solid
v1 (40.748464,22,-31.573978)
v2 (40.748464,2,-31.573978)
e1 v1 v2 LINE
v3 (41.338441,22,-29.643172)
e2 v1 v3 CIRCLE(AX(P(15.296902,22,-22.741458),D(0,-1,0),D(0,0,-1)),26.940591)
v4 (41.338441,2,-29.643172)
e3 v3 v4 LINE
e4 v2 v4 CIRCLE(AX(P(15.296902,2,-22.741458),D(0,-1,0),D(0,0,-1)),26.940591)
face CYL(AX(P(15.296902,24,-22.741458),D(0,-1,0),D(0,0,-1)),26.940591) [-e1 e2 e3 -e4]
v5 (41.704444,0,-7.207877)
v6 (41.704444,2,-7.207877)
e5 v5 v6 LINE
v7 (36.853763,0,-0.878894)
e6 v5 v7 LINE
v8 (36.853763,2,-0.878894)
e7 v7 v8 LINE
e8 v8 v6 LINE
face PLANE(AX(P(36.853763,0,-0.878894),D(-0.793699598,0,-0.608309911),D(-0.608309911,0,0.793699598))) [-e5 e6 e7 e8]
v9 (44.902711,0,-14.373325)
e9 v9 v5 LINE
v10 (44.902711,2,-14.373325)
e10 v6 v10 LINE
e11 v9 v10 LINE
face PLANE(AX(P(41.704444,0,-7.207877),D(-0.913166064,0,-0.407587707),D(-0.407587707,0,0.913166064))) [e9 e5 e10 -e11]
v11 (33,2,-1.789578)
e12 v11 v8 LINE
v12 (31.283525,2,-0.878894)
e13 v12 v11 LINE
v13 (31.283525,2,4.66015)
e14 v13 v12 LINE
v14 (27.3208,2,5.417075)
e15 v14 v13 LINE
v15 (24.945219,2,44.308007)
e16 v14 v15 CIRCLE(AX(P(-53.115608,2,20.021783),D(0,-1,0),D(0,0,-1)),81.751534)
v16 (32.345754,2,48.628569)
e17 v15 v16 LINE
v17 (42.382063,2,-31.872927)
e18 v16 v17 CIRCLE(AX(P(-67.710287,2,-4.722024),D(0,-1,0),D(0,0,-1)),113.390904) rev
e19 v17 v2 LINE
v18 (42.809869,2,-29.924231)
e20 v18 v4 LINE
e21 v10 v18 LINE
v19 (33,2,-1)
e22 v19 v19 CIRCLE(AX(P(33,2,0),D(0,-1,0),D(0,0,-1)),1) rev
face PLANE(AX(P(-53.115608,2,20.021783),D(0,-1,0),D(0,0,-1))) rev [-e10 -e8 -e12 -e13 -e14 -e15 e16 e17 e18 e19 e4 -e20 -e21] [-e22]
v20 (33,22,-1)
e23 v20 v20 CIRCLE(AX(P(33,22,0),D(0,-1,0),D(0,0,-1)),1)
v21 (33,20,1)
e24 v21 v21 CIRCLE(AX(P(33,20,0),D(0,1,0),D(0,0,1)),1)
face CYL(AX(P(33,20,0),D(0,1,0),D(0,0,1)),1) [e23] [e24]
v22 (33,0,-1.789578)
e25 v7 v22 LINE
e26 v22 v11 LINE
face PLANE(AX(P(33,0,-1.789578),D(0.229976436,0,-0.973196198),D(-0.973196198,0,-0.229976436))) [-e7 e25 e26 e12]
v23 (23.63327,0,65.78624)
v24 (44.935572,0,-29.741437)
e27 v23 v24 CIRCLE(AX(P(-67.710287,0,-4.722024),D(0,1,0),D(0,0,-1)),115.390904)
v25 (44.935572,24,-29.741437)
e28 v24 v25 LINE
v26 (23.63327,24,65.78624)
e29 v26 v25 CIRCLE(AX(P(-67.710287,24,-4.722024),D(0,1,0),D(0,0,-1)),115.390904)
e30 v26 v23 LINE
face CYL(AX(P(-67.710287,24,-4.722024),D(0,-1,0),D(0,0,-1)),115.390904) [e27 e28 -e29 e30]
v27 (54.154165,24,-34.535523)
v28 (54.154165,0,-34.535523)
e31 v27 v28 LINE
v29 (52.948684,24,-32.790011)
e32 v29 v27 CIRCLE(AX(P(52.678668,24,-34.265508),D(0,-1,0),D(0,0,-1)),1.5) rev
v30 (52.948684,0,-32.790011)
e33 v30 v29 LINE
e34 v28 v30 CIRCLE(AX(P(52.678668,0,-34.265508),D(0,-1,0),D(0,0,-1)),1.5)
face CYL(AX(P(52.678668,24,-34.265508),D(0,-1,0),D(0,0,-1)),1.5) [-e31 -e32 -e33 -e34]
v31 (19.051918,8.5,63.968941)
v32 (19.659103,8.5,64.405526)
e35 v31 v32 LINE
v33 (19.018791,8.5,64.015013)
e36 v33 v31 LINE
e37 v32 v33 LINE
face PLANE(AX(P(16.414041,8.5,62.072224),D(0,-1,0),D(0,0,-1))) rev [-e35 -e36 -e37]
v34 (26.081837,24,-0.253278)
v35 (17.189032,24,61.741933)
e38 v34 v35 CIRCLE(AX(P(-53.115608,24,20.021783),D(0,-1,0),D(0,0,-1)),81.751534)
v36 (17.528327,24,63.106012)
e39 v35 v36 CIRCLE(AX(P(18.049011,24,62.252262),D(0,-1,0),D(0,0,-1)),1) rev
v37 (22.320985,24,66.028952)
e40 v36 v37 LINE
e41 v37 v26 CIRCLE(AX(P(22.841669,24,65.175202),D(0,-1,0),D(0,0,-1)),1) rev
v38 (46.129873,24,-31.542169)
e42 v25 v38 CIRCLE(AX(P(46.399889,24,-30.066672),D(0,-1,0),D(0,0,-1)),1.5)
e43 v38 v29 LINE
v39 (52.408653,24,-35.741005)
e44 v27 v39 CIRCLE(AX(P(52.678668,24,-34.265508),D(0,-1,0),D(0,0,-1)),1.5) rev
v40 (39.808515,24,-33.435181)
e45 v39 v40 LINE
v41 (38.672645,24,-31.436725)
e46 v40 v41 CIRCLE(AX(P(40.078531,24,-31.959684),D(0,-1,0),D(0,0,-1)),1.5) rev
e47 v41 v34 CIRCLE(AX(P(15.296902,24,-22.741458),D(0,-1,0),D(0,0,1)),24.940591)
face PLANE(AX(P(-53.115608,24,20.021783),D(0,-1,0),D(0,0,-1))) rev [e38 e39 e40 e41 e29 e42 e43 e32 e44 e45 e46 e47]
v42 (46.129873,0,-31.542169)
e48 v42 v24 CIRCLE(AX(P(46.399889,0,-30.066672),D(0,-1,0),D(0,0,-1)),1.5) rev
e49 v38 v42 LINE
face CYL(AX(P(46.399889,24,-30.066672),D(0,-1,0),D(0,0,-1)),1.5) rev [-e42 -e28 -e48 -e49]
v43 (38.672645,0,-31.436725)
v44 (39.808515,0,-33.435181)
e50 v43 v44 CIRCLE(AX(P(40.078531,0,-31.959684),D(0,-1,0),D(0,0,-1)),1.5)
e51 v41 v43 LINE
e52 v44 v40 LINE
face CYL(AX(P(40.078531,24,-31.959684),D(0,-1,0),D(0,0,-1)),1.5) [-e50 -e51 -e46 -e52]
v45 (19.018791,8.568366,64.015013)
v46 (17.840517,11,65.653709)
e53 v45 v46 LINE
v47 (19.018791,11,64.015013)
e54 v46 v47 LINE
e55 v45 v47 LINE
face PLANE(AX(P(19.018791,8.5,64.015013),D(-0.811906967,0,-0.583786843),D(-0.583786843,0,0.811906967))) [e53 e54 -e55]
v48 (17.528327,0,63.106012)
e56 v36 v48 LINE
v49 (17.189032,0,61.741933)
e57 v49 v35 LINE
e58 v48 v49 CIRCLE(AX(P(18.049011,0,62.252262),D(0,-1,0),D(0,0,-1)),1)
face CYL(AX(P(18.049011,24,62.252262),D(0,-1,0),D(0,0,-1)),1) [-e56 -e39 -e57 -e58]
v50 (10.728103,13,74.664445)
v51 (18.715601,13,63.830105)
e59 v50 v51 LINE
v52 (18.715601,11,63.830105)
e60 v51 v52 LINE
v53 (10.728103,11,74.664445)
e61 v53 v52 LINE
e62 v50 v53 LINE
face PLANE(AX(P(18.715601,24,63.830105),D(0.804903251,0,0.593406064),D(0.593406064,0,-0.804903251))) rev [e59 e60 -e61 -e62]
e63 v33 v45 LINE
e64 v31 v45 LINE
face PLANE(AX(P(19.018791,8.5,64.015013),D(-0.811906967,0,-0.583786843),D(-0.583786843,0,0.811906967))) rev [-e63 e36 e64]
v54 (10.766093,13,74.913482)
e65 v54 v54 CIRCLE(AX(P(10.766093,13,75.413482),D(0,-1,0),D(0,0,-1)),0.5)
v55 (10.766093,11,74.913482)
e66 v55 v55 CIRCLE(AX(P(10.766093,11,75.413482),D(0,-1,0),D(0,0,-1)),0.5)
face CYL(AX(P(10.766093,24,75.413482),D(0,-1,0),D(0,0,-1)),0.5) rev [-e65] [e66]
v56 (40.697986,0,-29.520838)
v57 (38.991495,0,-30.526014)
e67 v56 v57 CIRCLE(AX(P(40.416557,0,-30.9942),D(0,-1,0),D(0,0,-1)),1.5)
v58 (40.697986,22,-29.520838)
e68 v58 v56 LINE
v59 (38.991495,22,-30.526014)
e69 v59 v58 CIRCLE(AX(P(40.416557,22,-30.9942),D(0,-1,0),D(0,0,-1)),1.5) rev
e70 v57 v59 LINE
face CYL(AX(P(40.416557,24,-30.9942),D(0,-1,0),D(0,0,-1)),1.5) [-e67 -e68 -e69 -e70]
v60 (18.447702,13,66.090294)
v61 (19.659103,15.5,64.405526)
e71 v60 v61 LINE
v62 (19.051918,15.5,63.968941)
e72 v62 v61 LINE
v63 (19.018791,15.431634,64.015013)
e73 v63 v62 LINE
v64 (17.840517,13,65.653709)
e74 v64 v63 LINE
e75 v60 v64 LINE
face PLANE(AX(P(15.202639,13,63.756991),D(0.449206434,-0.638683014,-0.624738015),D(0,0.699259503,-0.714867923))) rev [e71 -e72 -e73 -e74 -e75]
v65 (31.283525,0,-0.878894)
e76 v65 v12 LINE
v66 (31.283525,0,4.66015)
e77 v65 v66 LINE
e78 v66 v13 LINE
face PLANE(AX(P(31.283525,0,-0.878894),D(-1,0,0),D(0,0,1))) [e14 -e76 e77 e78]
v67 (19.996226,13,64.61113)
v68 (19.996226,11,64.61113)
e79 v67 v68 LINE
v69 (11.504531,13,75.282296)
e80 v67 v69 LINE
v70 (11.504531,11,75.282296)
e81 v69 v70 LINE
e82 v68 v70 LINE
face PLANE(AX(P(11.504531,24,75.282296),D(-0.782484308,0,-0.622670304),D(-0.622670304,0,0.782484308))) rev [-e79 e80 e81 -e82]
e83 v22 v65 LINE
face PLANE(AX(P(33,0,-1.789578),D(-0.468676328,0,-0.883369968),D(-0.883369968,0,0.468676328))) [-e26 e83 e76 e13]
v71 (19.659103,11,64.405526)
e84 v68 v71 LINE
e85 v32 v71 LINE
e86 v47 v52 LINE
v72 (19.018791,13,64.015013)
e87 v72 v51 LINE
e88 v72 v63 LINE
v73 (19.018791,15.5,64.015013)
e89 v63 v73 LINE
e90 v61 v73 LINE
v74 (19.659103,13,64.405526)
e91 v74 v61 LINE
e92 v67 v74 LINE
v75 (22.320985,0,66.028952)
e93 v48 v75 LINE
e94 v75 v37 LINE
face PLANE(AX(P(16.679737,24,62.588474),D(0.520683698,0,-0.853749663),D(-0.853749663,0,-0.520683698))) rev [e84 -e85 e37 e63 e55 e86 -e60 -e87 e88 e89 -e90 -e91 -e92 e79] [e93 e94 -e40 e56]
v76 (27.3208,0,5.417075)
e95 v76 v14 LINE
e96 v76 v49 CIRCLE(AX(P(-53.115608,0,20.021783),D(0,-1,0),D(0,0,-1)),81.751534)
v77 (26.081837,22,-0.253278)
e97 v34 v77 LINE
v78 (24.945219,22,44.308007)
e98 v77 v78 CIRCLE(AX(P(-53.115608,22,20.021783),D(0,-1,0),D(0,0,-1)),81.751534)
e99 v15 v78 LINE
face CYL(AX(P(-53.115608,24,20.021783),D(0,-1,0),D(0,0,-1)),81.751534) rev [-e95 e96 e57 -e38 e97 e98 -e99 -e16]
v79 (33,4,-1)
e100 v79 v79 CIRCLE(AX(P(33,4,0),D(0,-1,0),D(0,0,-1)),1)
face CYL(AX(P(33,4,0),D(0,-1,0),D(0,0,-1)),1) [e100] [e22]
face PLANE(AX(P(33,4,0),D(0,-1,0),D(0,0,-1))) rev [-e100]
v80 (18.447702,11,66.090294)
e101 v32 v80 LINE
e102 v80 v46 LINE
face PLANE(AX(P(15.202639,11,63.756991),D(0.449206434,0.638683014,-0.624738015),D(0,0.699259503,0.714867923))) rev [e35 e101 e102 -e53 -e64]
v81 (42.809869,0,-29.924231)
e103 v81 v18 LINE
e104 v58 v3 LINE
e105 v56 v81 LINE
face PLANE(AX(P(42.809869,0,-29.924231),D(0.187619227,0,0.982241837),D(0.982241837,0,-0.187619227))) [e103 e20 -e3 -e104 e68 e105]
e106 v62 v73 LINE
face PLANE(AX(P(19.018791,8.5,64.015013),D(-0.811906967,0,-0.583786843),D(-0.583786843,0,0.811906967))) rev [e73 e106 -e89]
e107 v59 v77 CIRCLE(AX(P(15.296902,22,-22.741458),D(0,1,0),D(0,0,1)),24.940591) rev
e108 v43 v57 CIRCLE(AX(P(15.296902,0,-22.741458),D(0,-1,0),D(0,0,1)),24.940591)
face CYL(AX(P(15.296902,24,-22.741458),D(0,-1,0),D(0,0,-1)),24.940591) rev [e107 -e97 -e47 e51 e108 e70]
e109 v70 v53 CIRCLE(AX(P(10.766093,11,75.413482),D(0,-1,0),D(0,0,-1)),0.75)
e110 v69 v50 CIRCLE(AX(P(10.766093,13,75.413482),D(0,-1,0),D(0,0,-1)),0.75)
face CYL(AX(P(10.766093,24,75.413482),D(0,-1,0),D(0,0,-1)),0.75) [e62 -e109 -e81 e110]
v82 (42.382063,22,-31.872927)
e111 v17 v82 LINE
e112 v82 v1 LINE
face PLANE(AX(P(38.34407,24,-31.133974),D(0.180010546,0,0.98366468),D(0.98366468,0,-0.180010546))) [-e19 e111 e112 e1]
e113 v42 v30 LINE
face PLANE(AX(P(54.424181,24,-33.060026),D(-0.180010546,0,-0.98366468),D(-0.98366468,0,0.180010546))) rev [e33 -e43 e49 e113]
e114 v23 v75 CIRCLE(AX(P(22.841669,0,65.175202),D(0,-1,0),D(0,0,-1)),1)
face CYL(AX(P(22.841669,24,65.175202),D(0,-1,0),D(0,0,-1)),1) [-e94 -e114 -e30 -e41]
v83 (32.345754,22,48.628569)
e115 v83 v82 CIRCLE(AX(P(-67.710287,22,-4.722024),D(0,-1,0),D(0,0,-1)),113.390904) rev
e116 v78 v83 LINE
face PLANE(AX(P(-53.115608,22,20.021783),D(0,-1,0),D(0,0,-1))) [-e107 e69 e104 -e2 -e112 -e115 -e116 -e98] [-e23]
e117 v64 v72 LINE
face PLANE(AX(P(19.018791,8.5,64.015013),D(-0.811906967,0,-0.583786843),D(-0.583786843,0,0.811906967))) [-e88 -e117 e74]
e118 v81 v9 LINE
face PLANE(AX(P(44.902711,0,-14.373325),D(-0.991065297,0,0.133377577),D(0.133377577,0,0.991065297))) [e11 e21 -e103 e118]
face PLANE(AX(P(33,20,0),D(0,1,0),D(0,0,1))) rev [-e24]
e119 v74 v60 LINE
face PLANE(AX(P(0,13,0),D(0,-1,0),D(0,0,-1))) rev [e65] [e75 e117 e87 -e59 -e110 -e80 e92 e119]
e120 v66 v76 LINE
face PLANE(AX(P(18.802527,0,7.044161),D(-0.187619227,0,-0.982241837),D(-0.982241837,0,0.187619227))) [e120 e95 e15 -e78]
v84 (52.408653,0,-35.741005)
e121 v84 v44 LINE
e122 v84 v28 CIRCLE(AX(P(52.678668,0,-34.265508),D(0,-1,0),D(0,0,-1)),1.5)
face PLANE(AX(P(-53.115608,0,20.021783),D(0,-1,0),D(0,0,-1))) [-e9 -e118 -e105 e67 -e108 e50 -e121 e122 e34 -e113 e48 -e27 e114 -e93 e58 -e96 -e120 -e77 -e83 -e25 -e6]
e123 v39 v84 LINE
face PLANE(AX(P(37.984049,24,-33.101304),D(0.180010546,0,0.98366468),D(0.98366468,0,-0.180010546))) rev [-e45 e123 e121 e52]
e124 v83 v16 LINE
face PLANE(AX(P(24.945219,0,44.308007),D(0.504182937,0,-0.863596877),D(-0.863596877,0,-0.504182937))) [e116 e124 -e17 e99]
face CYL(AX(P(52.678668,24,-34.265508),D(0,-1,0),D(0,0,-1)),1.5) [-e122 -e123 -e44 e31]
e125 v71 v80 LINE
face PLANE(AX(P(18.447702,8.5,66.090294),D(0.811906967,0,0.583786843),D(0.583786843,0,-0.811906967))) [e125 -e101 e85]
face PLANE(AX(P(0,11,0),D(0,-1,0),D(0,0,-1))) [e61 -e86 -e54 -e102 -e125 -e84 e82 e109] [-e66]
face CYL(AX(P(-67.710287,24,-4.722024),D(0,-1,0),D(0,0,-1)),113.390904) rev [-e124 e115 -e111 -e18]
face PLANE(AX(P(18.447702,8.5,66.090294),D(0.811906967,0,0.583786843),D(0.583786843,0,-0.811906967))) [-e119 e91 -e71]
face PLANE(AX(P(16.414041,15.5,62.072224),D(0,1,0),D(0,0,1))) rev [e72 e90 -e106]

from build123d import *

# Parameters (mm, degrees)
BOSS_EXTRUDE4_DEPTH      = 24
SHELL1_T                 = -2
SKETCH9_R                = 1
CUT_EXTRUDE1_DEPTH       = 22
SKETCH6_R                = 1
BOSS_EXTRUDE5_DEPTH      = 4
BOSS_EXTRUDE6_START      = -4
SKETCH8_R                = 1
BOSS_EXTRUDE6_DEPTH      = 4
BOSS_EXTRUDE7_START      = -24
BOSS_EXTRUDE7_DEPTH      = 24
FILLET1_R                = 1
FILLET2_R                = 1.5
SKETCH12_R               = 0.5
BOSS_EXTRUDE8_DEPTH      = 24
CUT_EXTRUDE3_DEPTH       = 11
CUT_EXTRUDE4_DEPTH       = 11
BOSS_EXTRUDE9_DEPTH      = 2.5
BOSS_EXTRUDE9_DEPTH_BACK = 4.5
CUT_EXTRUDE5_DEPTH       = 0.747850193


with BuildPart() as part:
    # Sketch5 → Boss-Extrude4 (new body)
    with BuildSketch(Plane(origin=(0, 0, 0), x_dir=(1, 0, 0), z_dir=(0, 1, 0))):
        with BuildLine():
            Line((16.679736529, -62.588474268), (23.082859001, -66.493602001))
            ThreePointArc((23.082859001, -66.493602001), (44.985866831, -20.069862482), (44.587534446, 31.259921018))
            Line((44.587534446, 31.259921018), (54.42418125, 33.060026475))
            Line((54.42418125, 33.060026475), (53.884149613, 36.011020517))
            Line((53.884149613, 36.011020517), (37.98404912, 33.101303594))
            ThreePointArc((37.98404912, 33.101303594), (38.745638884, 14.245000299), (26.08183659, 0.253277589))
            ThreePointArc((26.08183659, 0.253277589), (27.736010667, -32.118438365), (16.679736529, -62.588474268))
        make_face()
    extrude(amount=BOSS_EXTRUDE4_DEPTH)

    # Shell1
    shell1_openings = [part.faces().sort_by_distance(p)[0] for p in [
        (27.736010667, 12, 32.118438365),
    ]]
    offset(amount=SHELL1_T, openings=shell1_openings, kind=Kind.INTERSECTION)

    # Sketch9 → Cut-Extrude1 (cut)
    with BuildSketch(Plane(origin=(0, 22, 0), x_dir=(-1, 0, 0), z_dir=(0, -1, 0))):
        with Locations(Location((-33, 0, 0), (0, 0, 90))):
            Circle(SKETCH9_R)
        Polygon((-18.802526646, -7.044160924), (-31.283524546, -4.66015009), (-31.283524546, 0.878893836), (-33, 1.78957842), (-36.853763417, 0.878893836), (-41.704444312, 7.207877481), (-44.902710544, 14.373324664), (-42.809869411, 29.924231084), (-24.798121137, 26.483784785), align=None)
    extrude(amount=CUT_EXTRUDE1_DEPTH, mode=Mode.SUBTRACT)

    # Sketch6 → Boss-Extrude5 (add)
    with BuildSketch(Plane(origin=(0, 24, 0), x_dir=(1, 0, 0), z_dir=(0, 1, 0))):
        with Locations(Location((33, 0, 0), (0, 0, 90))):
            Circle(SKETCH6_R)
    extrude(amount=-BOSS_EXTRUDE5_DEPTH)

    # Sketch8 → Boss-Extrude6 (add)
    with BuildSketch(Plane(origin=(0, 0, 0), x_dir=(-1, 0, 0), z_dir=(0, -1, 0)).offset(BOSS_EXTRUDE6_START)):
        with Locations(Location((-33, 0, 0), (0, 0, 270))):
            Circle(SKETCH8_R)
    extrude(amount=BOSS_EXTRUDE6_DEPTH)

    # Sketch11 → Boss-Extrude7 (add)
    with BuildSketch(Plane(origin=(0, 24, 0), x_dir=(1, 0, 0), z_dir=(0, 1, 0)).offset(BOSS_EXTRUDE7_START)):
        with BuildLine():
            Line((16.679736529, -62.588474268), (23.082859001, -66.493602001))
            ThreePointArc((23.082859001, -66.493602001), (28.946672892, -58.305690928), (34.074211637, -49.637672267))
            Line((34.074211637, -49.637672267), (24.945218618, -44.308006728))
            ThreePointArc((24.945218618, -44.308006728), (21.37536937, -53.70275106), (16.679736529, -62.588474268))
        make_face()
    extrude(amount=BOSS_EXTRUDE7_DEPTH)

    # Fillet1
    fillet1_edges = [part.edges().sort_by_distance(p)[0] for p in [
        (23.082859001, 12, 66.493602001),
        (16.679736529, 12, 62.588474268),
    ]]
    fillet(fillet1_edges, radius=FILLET1_R)

    # Fillet2
    fillet2_edges = [part.edges().sort_by_distance(p)[0] for p in [
        (39.36869634, 11, -29.266928363),
        (37.98404912, 12, -33.101303594),
        (53.884149613, 12, -36.011020517),
        (54.42418125, 12, -33.060026475),
        (44.587534446, 12, -31.259921018),
    ]]
    fillet(fillet2_edges, radius=FILLET2_R - 0.0001)  # a hair under: the kernel refuses the full size

    # Sketch12 → Boss-Extrude8 (add)
    with BuildSketch(Plane(origin=(0, 0, 0), x_dir=(1, 0, 0), z_dir=(0, 1, 0))):
        with BuildLine():
            Line((18.715601118, -63.830104629), (10.728103117, -74.664444727))
            ThreePointArc((10.728103117, -74.664444727), (10.299090631, -76.000345168), (11.504530989, -75.282295557))
            Line((11.504530989, -75.282295557), (19.996225612, -64.611130176))
            Line((19.996225612, -64.611130176), (18.715601118, -63.830104629))
        make_face()
        with Locations(Location((10.766093359, -75.413481937, 0), (0, 0, 270))):
            Circle(SKETCH12_R, mode=Mode.SUBTRACT)
    extrude(amount=BOSS_EXTRUDE8_DEPTH)

    # Sketch13 → Cut-Extrude3 (cut)
    with BuildSketch(Plane(origin=(0, 0, 0), x_dir=(1, 0, 0), z_dir=(0, 1, 0))):
        Polygon((19.996225612, -64.611130176), (24.885458438, -67.592968924), (14.482058763, -80.670297518), (6.551415536, -74.361237485), (17.528327491, -63.106011785), align=None)
    extrude(amount=CUT_EXTRUDE3_DEPTH, mode=Mode.SUBTRACT)

    # Sketch14 → Cut-Extrude4 (cut)
    with BuildSketch(Plane(origin=(0, 24, 0), x_dir=(1, 0, 0), z_dir=(0, 1, 0))):
        Polygon((19.996225612, -64.611130176), (15.918276164, -82.297397679), (4.930036713, -72.505157079), (18.705017469, -63.823649888), align=None)
    extrude(amount=-CUT_EXTRUDE4_DEPTH, mode=Mode.SUBTRACT)

    # Sketch15 → Boss-Extrude9 (add, two sides: drawn at the far end of the back side and taken through both)
    with BuildSketch(Plane(origin=(0, 13, 0), x_dir=(1, 0, 0), z_dir=(0, 1, 0)).offset(-BOSS_EXTRUDE9_DEPTH_BACK)):
        Polygon((19.018790552, -64.015013394), (17.840516782, -65.653708569), (18.447701563, -66.090293672), (19.659102799, -64.405526167), align=None)
    extrude(amount=BOSS_EXTRUDE9_DEPTH + BOSS_EXTRUDE9_DEPTH_BACK)

    # Sketch16 → Cut-Extrude5 (cut)
    with BuildSketch(Plane(origin=(43.486111653, 0, 31.267892586), x_dir=(0.5837868426462293, 0, -0.8119069665627625), z_dir=(0.8119069665627625, 0, 0.5837868426462293))):
        Polygon((-42.889644405, 13), (-40.814569828, 15.5), (-42.889644405, 15.5), align=None)
        Polygon((-42.889644405, 11), (-40.814569828, 8.5), (-42.889644405, 8.5), align=None)
    extrude(amount=-CUT_EXTRUDE5_DEPTH, mode=Mode.SUBTRACT)


solid = part.part
